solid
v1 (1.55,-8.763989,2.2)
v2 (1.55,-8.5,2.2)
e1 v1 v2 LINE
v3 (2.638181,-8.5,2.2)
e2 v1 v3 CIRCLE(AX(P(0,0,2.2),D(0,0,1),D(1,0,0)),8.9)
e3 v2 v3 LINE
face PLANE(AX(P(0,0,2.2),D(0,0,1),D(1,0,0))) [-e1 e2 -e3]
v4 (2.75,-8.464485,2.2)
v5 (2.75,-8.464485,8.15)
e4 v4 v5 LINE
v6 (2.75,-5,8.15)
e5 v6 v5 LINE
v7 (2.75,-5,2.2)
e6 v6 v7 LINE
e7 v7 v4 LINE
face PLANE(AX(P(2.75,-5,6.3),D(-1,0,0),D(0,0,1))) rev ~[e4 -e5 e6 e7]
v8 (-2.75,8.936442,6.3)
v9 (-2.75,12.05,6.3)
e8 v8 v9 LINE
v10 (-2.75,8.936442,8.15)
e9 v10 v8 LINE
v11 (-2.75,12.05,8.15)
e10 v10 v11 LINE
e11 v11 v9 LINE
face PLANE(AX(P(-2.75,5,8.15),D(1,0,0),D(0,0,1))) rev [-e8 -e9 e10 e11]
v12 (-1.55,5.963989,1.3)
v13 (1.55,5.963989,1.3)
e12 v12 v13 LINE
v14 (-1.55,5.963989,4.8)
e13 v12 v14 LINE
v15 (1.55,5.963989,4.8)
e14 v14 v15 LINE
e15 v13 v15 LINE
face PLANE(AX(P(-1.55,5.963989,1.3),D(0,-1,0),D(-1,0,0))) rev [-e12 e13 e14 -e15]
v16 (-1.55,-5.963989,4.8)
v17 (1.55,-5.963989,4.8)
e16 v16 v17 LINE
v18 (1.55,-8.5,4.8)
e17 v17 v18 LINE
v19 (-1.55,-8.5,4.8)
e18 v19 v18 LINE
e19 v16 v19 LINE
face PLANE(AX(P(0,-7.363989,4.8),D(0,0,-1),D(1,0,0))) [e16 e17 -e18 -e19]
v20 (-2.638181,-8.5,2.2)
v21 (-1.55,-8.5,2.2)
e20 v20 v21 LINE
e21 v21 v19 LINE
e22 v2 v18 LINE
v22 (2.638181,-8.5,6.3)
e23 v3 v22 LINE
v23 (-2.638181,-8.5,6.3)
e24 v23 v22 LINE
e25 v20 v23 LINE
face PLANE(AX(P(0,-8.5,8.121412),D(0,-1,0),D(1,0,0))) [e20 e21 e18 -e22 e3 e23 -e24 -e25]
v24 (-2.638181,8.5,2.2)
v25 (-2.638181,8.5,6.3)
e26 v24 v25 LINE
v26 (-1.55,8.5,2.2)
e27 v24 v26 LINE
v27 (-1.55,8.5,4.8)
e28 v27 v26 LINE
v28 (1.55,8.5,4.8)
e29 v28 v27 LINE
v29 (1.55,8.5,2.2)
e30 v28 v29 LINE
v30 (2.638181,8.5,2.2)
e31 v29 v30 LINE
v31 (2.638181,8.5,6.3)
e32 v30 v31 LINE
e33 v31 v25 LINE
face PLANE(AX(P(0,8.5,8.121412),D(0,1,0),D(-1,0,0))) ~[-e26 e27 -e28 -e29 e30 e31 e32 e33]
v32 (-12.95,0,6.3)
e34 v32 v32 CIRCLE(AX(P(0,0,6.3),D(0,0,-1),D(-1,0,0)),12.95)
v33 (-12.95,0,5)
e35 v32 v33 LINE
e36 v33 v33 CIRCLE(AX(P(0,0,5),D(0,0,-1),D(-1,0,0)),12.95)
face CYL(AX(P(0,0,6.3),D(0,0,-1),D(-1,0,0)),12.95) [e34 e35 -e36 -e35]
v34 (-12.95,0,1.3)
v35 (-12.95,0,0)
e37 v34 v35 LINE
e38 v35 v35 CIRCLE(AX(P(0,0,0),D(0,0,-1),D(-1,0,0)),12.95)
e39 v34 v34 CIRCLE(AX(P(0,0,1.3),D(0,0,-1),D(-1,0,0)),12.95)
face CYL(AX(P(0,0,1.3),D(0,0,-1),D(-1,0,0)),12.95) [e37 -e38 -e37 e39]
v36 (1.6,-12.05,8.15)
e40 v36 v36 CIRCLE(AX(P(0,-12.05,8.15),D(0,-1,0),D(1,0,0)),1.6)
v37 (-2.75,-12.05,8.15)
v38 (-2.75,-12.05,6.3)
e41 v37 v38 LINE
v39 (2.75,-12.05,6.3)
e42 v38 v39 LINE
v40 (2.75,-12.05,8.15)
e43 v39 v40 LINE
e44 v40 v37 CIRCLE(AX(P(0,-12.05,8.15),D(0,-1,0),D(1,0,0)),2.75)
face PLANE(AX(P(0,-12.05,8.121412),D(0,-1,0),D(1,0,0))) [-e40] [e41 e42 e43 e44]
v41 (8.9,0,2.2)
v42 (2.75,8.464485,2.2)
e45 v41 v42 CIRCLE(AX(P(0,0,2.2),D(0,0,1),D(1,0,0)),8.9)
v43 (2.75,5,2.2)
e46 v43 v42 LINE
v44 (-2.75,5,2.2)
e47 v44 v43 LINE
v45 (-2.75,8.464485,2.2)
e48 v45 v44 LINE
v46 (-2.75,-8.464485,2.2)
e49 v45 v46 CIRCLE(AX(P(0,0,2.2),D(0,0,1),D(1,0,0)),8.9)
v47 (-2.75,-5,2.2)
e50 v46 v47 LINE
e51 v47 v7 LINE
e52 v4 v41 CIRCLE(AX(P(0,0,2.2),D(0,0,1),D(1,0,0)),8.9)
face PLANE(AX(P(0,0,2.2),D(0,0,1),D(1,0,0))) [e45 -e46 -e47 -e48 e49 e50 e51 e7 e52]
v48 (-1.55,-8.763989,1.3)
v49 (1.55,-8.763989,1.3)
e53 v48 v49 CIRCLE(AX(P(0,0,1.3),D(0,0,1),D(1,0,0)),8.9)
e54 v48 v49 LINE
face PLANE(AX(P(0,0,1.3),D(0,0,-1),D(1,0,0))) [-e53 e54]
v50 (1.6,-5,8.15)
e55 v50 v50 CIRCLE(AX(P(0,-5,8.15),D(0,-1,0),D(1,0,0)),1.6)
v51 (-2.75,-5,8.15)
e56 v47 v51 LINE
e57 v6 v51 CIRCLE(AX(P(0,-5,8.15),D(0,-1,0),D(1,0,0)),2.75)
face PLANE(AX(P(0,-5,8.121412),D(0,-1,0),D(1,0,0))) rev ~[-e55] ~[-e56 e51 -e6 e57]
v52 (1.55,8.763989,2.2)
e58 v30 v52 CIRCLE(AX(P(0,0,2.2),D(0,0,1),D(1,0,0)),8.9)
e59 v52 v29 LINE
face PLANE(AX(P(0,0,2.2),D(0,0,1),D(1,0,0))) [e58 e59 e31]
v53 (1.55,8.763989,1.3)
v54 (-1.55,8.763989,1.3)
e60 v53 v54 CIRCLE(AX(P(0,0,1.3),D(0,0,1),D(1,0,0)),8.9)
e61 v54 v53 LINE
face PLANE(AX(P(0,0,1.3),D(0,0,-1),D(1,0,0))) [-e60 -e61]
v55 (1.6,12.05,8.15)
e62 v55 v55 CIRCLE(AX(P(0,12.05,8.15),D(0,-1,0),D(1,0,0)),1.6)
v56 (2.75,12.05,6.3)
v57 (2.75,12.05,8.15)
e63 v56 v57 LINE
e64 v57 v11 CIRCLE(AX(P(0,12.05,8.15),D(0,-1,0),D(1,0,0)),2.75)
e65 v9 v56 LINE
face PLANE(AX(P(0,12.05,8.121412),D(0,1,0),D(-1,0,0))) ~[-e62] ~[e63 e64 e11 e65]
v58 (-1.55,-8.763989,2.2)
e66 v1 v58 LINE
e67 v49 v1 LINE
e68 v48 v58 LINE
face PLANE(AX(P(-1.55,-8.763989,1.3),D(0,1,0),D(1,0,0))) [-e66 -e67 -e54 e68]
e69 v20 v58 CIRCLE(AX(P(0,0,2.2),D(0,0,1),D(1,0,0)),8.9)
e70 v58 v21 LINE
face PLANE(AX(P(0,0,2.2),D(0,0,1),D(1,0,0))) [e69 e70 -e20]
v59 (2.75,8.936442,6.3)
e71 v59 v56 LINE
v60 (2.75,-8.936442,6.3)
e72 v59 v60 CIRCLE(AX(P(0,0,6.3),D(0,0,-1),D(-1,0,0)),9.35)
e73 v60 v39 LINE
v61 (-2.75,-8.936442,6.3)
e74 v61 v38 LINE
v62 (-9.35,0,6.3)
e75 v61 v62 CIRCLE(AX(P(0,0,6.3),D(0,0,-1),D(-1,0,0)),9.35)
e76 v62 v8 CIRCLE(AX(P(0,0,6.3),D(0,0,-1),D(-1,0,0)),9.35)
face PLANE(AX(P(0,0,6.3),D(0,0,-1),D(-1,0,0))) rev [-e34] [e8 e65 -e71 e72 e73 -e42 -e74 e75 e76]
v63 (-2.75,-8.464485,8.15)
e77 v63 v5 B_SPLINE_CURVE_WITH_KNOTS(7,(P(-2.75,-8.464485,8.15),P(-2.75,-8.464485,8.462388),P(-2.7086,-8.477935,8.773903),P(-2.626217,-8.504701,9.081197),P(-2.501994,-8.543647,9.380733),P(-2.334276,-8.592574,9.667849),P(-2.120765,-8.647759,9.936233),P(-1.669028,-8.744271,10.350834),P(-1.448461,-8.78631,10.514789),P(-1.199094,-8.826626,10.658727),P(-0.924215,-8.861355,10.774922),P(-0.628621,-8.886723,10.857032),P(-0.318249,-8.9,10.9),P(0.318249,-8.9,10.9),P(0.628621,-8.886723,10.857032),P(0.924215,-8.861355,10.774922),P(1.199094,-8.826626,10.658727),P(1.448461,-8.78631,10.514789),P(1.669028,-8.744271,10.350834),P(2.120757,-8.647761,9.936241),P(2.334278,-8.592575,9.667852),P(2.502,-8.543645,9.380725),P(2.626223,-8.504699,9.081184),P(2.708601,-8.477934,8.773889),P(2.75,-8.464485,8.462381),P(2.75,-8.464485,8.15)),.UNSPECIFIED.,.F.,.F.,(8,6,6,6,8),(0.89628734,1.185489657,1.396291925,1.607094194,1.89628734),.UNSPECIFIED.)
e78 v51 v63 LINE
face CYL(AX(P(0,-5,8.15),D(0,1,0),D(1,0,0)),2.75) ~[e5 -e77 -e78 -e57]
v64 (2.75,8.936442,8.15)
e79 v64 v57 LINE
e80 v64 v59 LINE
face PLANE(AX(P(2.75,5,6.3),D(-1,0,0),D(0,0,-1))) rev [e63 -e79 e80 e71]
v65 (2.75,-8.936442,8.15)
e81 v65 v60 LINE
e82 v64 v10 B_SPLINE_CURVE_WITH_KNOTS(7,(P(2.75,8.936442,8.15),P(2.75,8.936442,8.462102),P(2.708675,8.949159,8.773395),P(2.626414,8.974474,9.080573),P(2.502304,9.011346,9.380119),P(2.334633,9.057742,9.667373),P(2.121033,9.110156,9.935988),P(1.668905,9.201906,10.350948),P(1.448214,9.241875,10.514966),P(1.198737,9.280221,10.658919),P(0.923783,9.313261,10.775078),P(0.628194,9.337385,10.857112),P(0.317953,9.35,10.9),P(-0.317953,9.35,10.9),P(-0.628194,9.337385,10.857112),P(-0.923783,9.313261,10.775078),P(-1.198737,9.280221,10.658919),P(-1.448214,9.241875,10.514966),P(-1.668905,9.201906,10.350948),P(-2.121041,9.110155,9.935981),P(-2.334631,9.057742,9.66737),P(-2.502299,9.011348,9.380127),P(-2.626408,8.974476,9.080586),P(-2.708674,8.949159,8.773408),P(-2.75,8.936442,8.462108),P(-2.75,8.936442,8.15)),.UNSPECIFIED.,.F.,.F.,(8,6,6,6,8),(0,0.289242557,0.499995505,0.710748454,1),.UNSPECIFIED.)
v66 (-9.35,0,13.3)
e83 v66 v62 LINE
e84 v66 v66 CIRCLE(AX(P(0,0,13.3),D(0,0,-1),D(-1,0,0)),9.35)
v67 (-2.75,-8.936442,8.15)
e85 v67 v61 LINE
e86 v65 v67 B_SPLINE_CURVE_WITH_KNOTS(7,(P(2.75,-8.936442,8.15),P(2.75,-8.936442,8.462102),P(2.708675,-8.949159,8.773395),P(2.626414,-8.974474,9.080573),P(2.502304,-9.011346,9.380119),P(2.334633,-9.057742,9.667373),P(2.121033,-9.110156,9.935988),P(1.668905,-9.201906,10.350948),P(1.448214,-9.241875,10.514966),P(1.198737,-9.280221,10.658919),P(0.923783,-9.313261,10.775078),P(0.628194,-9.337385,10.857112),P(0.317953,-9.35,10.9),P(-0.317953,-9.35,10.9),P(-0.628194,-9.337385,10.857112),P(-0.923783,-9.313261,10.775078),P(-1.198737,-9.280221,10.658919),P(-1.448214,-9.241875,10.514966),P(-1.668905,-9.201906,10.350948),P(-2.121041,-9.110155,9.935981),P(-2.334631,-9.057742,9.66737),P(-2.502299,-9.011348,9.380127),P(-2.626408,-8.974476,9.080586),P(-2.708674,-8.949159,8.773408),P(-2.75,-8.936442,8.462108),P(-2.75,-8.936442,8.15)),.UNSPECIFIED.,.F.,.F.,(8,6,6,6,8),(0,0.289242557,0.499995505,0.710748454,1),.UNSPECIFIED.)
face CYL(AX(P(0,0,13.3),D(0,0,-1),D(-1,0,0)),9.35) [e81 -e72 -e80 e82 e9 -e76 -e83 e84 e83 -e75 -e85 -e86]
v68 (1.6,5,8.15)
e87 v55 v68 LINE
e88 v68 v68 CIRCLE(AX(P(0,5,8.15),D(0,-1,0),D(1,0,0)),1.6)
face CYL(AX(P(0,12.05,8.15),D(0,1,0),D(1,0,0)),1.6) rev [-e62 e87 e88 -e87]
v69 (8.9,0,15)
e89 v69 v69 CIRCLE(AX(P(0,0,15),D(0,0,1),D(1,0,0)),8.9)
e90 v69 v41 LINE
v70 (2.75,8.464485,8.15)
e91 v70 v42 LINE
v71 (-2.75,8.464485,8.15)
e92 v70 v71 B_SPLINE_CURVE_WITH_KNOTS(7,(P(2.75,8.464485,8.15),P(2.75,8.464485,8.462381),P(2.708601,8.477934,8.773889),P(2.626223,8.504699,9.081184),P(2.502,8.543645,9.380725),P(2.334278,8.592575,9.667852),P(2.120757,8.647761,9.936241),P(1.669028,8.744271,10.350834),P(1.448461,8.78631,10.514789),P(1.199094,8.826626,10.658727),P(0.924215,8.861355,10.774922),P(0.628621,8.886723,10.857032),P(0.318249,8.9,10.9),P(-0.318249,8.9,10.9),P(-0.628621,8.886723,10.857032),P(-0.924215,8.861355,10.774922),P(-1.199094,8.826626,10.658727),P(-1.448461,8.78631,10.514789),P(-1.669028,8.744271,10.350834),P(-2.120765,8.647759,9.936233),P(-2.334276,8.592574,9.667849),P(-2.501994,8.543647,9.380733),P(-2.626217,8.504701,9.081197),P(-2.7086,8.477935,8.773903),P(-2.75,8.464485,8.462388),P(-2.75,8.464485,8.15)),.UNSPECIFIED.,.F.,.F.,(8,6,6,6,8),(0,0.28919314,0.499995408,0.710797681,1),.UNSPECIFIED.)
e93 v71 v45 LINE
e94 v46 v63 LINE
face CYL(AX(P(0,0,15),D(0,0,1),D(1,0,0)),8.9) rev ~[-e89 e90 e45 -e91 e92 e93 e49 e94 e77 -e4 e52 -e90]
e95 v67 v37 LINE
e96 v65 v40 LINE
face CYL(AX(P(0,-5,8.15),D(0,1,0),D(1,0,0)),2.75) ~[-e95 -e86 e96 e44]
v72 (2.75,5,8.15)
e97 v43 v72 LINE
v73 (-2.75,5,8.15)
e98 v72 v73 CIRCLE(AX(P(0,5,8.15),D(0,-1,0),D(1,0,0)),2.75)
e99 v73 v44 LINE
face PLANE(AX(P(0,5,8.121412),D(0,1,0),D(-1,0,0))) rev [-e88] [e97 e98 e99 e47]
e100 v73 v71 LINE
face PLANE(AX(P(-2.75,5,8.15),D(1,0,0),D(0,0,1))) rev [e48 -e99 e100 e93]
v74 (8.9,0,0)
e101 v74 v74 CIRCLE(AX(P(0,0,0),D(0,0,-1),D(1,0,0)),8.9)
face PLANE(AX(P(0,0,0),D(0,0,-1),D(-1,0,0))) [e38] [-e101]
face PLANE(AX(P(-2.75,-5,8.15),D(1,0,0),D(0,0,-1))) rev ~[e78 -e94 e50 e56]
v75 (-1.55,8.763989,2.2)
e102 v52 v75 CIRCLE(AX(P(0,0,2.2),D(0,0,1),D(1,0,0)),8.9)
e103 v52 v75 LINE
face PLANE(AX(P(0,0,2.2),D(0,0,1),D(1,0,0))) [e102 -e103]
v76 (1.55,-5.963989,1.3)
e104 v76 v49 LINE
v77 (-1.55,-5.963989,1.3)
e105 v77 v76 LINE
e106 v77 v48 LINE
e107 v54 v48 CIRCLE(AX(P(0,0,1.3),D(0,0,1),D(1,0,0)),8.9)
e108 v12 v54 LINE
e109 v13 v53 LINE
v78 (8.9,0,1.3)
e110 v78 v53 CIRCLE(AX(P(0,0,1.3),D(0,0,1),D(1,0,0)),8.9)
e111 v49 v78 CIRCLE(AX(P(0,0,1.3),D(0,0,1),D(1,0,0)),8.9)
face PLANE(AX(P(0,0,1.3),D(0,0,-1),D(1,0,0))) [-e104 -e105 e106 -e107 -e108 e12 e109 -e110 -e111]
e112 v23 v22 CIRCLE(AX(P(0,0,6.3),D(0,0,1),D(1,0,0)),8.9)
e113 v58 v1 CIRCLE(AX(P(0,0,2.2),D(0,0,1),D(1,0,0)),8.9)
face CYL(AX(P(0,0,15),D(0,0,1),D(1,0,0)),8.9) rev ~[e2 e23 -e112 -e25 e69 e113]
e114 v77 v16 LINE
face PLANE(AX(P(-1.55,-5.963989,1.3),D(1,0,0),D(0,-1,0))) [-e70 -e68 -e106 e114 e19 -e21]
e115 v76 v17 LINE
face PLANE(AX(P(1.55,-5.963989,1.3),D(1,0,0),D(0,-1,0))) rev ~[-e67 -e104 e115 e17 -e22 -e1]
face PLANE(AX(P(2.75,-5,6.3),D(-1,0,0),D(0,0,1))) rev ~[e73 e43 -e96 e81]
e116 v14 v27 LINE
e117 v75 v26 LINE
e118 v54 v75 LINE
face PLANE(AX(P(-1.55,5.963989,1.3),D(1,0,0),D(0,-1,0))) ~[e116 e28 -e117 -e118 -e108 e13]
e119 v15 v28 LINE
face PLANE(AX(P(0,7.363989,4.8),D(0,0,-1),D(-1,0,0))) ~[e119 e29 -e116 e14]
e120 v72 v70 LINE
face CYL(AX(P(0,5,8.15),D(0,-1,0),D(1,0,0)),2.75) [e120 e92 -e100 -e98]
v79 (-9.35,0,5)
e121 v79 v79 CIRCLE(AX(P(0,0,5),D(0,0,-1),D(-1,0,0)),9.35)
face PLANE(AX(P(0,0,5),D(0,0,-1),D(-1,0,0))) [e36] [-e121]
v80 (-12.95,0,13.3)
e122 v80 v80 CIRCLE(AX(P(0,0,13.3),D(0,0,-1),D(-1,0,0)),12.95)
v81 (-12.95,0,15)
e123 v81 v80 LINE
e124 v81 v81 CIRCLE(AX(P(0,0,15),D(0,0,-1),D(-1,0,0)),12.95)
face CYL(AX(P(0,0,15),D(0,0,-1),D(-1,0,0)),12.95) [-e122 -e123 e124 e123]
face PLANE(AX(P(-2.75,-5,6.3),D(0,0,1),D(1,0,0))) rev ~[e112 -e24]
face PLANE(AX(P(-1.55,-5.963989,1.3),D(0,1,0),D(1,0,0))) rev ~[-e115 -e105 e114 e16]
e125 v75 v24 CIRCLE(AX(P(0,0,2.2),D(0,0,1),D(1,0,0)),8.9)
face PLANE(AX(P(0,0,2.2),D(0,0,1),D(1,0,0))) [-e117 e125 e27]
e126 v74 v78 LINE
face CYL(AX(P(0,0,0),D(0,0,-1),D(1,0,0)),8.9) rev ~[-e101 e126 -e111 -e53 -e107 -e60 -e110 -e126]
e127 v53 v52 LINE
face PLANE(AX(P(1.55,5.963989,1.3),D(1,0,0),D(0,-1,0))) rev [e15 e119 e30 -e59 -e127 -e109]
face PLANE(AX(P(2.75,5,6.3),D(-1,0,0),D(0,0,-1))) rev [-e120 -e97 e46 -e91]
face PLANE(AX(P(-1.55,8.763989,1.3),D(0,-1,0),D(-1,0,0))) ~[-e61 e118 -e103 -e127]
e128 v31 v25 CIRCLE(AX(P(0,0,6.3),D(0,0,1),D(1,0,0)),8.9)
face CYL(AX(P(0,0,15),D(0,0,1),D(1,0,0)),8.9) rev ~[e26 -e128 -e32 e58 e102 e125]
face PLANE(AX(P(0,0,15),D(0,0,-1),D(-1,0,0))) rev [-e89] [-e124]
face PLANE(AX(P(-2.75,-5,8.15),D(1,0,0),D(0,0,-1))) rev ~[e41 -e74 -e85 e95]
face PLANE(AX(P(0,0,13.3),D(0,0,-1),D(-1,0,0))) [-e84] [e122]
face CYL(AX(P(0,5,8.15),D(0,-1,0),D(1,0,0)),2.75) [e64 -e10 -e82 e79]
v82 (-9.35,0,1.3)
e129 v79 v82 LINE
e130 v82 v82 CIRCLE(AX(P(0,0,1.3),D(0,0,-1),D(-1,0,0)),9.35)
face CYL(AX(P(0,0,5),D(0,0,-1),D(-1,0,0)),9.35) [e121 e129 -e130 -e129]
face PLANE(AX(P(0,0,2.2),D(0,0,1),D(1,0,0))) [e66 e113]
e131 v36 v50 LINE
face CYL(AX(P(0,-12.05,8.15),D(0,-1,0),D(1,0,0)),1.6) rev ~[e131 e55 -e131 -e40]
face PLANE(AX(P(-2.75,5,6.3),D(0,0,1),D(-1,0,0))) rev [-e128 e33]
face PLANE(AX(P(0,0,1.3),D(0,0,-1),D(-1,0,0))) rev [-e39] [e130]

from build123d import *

# Parameters (mm, degrees)
F2_R      = 8.9
F3_DEPTH  = 1.3
F4_R      = 8.9
F5_DEPTH  = 12.8
F7_START  = 5
F7_DEPTH  = 7.05
F9_START  = 5
F8_W      = 5.5
F8_H      = 1.3
F8_H_2    = 3.7
F9_DEPTH  = 3.5
F10_R     = 1.6
F11_DEPTH = 7.05
F12_W     = 3.1
F12_H     = 2.8
F13_DEPTH = 3.5


# Not quite as in the source:
# - a feature of the source that left no trace in its solid (it failed there, or was rolled back) is left out
# - a pattern or mirror of a feature is missing from the dataset's text; its kind, count and spacing are read off the source's solid


with BuildPart() as f1:
    # F0 (on Front) → F1 (revolve)
    with BuildSketch(Plane.XZ):
        Polygon((-12.95, 0), (0, 0), (0, 15), (-12.95, 15), (-12.95, 13.3), (-9.35, 13.3), (-9.35, 6.3), (-12.95, 6.3), (-12.95, 5), (-9.35, 5), (-9.35, 1.3), (-12.95, 1.3), align=None)
    revolve(axis=Axis((0, 0, 7.5), (0, 0, -1)))

    # F2 (on face) → F3 (cut)
    with BuildSketch(Plane(origin=(0, 0, 0), x_dir=(1, 0, 0), z_dir=(0, 0, -1))):
        Circle(F2_R)
    extrude(amount=-F3_DEPTH, mode=Mode.SUBTRACT)

    # F4 (on face) → F5 (cut)
    with BuildSketch(Plane.XY.offset(15)):
        Circle(F4_R)
    extrude(amount=-F5_DEPTH, mode=Mode.SUBTRACT)

    # F6 (on Front) → F7 (join)
    with BuildSketch(Plane.XZ.offset(F7_START)):
        with BuildLine():
            Line((2.75, 6.3), (2.75, 8.15))
            ThreePointArc((2.75, 8.15), (0, 10.9), (-2.75, 8.15))
            Line((-2.75, 8.15), (-2.75, 6.3))
            Line((-2.75, 6.3), (2.75, 6.3))
        make_face()
    f7 = extrude(amount=F7_DEPTH)

    # F7_copies: F7 across plane
    add(f7.mirror(Plane.ZX))

    # F8 (on Front) → F9 (join)
    with BuildSketch(Plane.XZ.offset(F9_START)):
        with BuildLine():
            ThreePointArc((2.75, 8.15), (0, 10.9), (-2.75, 8.15))
            Line((-2.75, 8.15), (-2.75, 6.3))
            Line((-2.75, 6.3), (2.75, 6.3))
            Line((2.75, 6.3), (2.75, 8.15))
        make_face()
        with Locations((0, 5.65)):
            Rectangle(F8_W, F8_H)
        with Locations((0, 3.15)):
            Rectangle(F8_W, F8_H_2)
    f9 = extrude(amount=F9_DEPTH)

    # F9_copies: F9 across plane
    add(f9.mirror(Plane.ZX))

    # F10 (on face) → F11 (cut, through all)
    with BuildSketch(Plane.XZ.offset(12.05)):
        with Locations((0, 8.15)):
            Circle(F10_R)
    f11 = extrude(amount=-F11_DEPTH, mode=Mode.SUBTRACT)

    # F11_copies: F11 across plane
    add(f11.mirror(Plane.ZX), mode=Mode.SUBTRACT)

    # F12 (on face) → F13 (cut)
    with BuildSketch(Plane(origin=(0, 0, 1.3), x_dir=(1, 0, 0), z_dir=(0, 0, -1))):
        with Locations((0, 7.3639888179)):
            Rectangle(F12_W, F12_H)
    f13 = extrude(amount=-F13_DEPTH, mode=Mode.SUBTRACT)

    # F13_copies: F13 across plane
    add(f13.mirror(Plane.ZX), mode=Mode.SUBTRACT)


solid = f1.part
